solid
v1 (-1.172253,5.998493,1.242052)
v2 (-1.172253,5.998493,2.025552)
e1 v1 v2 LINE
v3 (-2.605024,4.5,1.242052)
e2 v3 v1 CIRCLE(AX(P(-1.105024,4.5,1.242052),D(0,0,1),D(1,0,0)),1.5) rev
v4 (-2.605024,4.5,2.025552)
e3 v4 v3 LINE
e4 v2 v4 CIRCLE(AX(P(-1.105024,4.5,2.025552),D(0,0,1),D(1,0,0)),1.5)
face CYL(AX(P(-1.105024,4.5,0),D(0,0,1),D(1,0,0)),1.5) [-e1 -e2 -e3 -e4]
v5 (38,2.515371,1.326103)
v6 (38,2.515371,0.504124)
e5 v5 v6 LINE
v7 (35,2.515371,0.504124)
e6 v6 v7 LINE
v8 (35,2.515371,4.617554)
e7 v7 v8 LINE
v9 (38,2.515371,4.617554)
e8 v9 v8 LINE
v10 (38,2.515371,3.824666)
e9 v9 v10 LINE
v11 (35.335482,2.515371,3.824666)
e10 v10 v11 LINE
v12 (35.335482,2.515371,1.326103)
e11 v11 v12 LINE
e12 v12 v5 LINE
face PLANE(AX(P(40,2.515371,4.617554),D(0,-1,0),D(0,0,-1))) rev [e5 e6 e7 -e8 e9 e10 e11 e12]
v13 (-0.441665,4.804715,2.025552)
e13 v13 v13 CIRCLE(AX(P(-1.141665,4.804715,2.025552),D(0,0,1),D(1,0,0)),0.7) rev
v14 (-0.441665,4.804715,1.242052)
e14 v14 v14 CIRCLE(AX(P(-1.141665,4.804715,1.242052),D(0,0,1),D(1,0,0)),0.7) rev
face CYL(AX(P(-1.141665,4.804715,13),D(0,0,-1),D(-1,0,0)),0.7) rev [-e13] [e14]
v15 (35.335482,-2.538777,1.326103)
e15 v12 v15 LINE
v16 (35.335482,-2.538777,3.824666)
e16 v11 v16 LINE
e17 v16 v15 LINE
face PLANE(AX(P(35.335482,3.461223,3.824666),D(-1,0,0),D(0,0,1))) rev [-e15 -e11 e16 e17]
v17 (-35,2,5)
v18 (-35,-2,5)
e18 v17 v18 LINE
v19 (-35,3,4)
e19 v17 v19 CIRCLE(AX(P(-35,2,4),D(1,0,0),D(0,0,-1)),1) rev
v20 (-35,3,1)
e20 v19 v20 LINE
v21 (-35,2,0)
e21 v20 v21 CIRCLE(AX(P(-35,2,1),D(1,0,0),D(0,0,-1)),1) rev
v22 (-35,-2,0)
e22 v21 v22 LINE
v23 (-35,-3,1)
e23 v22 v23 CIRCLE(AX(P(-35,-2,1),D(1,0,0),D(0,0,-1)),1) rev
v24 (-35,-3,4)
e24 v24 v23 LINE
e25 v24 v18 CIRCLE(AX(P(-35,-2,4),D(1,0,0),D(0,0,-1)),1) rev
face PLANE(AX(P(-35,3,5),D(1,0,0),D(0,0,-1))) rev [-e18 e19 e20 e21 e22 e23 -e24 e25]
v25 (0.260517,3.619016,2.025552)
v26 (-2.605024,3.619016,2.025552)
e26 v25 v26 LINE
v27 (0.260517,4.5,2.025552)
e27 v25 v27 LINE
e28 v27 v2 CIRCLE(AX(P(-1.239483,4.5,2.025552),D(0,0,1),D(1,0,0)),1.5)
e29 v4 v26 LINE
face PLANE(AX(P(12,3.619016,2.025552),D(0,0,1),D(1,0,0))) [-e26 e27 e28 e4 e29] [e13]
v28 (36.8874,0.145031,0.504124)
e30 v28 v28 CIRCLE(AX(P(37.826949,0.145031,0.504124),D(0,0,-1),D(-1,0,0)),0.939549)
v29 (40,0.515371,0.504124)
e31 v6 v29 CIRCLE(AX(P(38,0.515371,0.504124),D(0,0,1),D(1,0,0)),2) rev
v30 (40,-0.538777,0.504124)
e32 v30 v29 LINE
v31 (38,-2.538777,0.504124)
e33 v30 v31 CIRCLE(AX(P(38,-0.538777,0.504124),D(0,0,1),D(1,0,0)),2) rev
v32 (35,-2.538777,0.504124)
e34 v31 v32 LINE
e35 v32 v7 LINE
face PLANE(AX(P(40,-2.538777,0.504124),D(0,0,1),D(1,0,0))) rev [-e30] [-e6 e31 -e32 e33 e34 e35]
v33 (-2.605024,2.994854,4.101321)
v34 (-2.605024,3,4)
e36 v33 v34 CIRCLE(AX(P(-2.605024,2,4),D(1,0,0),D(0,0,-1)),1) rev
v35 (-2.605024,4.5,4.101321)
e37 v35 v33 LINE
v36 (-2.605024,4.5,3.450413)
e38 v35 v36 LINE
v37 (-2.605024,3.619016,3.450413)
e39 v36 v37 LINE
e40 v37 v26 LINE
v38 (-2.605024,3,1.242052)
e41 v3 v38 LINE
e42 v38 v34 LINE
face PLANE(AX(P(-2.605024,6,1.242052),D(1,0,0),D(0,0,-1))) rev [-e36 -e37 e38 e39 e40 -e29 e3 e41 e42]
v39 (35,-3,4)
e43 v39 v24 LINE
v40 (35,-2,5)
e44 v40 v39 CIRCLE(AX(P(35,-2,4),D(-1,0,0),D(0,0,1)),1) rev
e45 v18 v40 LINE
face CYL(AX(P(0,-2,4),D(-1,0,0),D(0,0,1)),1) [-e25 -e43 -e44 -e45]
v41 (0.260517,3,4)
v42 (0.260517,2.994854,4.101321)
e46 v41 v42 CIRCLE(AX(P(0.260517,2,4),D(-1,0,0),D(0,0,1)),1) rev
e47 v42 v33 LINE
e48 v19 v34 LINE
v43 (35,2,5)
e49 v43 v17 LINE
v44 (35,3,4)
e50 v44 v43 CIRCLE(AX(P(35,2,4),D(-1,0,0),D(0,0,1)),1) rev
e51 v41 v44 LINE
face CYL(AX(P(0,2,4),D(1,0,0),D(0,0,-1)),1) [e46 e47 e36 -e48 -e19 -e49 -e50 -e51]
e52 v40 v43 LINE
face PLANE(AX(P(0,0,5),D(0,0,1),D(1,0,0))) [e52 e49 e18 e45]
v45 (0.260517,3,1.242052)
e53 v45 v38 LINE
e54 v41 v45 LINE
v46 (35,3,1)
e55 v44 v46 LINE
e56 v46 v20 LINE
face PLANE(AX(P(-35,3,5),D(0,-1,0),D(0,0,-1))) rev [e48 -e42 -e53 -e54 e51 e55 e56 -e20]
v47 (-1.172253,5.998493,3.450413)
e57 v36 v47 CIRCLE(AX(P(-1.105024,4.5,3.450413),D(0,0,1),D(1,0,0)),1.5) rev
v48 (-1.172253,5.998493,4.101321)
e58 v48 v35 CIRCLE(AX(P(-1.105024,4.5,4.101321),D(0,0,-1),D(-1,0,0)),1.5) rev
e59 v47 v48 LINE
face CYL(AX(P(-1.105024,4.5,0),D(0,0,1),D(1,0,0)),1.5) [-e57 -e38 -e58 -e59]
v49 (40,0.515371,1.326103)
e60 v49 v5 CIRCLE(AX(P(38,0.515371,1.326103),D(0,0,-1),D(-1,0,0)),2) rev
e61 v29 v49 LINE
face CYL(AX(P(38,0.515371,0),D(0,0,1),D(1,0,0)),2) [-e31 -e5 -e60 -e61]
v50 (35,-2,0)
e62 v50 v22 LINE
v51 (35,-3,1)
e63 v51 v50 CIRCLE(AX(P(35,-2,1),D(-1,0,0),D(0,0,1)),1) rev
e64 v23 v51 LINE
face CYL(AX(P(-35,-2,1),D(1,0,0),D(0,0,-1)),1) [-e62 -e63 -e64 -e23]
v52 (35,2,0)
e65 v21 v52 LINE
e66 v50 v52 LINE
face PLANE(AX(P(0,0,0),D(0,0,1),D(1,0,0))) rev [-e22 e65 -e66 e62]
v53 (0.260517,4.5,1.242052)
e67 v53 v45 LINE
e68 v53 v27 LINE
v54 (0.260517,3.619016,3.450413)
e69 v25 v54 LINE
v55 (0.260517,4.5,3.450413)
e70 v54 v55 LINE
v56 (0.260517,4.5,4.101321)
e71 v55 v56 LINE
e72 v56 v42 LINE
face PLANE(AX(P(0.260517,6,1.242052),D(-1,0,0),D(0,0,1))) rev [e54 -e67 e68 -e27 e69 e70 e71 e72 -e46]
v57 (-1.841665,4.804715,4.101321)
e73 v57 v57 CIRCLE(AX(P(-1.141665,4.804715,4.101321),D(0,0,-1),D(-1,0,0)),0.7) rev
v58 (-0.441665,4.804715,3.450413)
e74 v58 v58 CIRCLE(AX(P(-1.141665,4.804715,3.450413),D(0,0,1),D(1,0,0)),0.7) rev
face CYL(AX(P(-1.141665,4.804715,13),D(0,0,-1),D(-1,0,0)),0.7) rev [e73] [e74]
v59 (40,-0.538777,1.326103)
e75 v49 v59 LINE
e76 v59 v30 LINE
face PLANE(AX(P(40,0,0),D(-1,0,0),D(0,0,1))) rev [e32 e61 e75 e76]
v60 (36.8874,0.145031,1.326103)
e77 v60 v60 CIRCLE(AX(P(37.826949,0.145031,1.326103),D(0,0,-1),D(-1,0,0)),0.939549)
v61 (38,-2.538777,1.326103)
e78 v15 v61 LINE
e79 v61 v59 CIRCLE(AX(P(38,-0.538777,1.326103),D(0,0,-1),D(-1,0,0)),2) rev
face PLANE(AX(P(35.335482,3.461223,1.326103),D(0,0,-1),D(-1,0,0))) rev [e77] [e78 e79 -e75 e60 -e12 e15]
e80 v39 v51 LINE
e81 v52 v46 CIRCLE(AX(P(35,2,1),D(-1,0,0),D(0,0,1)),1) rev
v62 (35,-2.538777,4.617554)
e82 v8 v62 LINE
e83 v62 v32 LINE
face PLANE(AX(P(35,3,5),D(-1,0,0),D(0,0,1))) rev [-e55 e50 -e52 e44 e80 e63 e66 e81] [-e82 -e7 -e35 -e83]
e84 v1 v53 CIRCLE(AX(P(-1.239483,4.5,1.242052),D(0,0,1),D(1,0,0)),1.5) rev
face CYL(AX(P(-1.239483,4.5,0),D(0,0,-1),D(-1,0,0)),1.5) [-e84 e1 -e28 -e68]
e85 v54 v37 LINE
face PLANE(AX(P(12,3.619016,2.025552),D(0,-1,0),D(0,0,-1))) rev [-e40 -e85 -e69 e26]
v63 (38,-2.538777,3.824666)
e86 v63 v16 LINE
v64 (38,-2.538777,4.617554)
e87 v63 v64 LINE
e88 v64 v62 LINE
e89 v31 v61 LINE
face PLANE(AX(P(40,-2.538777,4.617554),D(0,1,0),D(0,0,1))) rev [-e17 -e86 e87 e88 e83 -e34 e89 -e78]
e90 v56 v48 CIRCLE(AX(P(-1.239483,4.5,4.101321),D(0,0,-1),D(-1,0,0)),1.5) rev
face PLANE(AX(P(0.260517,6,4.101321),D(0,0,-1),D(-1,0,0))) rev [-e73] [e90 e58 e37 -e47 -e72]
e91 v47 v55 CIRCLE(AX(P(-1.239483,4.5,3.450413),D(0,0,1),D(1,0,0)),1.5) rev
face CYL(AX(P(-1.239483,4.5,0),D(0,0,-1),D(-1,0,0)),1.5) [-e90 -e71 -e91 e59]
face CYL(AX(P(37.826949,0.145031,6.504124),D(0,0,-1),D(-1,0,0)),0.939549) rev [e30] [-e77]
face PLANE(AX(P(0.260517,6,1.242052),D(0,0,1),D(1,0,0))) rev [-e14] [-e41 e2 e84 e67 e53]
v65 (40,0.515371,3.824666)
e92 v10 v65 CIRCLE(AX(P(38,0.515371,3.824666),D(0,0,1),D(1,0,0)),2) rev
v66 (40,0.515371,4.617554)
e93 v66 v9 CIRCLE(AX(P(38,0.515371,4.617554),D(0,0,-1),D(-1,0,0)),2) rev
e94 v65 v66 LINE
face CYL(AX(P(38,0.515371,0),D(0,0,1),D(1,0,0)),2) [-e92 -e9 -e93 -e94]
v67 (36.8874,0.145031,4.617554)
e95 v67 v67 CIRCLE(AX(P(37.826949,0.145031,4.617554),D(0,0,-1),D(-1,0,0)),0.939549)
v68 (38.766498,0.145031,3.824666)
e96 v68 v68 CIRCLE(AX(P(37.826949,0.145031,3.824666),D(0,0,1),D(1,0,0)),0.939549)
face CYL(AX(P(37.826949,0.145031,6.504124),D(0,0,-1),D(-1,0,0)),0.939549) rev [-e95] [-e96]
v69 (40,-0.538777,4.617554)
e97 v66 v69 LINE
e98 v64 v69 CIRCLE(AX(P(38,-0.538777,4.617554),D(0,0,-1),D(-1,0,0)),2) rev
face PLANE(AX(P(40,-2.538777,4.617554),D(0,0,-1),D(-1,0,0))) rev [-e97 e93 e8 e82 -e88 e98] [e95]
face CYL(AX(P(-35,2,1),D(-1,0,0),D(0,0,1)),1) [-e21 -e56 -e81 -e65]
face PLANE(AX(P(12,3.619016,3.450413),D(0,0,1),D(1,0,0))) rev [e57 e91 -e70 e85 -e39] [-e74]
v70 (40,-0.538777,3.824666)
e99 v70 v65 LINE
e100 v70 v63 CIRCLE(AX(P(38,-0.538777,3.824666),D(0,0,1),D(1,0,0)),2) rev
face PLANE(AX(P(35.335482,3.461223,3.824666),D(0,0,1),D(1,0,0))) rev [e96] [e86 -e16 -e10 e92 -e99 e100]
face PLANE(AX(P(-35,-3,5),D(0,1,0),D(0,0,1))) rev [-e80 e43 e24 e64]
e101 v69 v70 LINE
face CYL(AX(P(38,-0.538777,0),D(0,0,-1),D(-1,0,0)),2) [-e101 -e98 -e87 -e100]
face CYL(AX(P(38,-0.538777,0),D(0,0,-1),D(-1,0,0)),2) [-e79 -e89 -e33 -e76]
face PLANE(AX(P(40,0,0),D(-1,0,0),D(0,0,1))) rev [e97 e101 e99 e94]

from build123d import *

# Parameters (mm, degrees)
SKETCH1_W               = 70
SKETCH1_H               = 6
BOSS_EXTRUDE1_DEPTH     = 5
SKETCH5_W               = 4.113429611
SKETCH5_H               = 5.054148352
BOSS_EXTRUDE4_DEPTH     = 40
SKETCH9_W               = 5.188919622
SKETCH9_H               = 2.498562964
CUT_EXTRUDE6_DEPTH      = 6
FILLET14_R              = 1
FILLET15_R              = 1
SKETCH11_R              = 0.939549209
CUT_EXTRUDE8_DEPTH      = 6
FILLET19_R              = 2
SKETCH12_W              = 2.865541581
SKETCH12_H              = 2.859268941
BOSS_EXTRUDE5_DEPTH     = 6
CUT_EXTRUDE9_DEPTH      = 12
CUT_EXTRUDE9_DEPTH_BACK = 5
SKETCH13_W              = 1.424860979
SKETCH13_H              = 2.636738839
SKETCH14_R              = 0.7
CUT_EXTRUDE10_DEPTH     = 13
FILLET20_R              = 1.5


with BuildPart() as part:
    # Sketch1 → Boss-Extrude1 (new body)
    with BuildSketch(Plane.XY):
        Rectangle(SKETCH1_W, SKETCH1_H)
    extrude(amount=BOSS_EXTRUDE1_DEPTH)

    # Sketch5 → Boss-Extrude4 (add)
    with BuildSketch(Plane(origin=(0, 0, 0), x_dir=(0, 0, -1), z_dir=(1, 0, 0))):
        with Locations((-2.56083925, -0.011702819)):
            Rectangle(SKETCH5_W, SKETCH5_H)
    extrude(amount=BOSS_EXTRUDE4_DEPTH)

    # Sketch9 → Cut-Extrude6 (cut)
    with BuildSketch(Plane.XZ.offset(2.538776995)):
        with Locations((37.929941449, 2.575384926)):
            Rectangle(SKETCH9_W, SKETCH9_H)
    extrude(amount=-CUT_EXTRUDE6_DEPTH, mode=Mode.SUBTRACT)

    # Fillet14
    fillet14_edges = [part.edges().sort_by_distance(p)[0] for p in [
        (0, 3, 5),
    ]]
    fillet(fillet14_edges, radius=FILLET14_R)

    # Fillet15
    fillet15_edges = [part.edges().sort_by_distance(p)[0] for p in [
        (0, -3, 5),
        (0, -3, 0),
        (0, 3, 0),
    ]]
    fillet(fillet15_edges, radius=FILLET15_R)

    # Sketch11 → Cut-Extrude8 (cut)
    with BuildSketch(Plane(origin=(0, 0, 0.504124444), x_dir=(-1, 0, 0), z_dir=(0, 0, -1))):
        with Locations((-37.826949183, 0.145030674)):
            Circle(SKETCH11_R)
    extrude(amount=-CUT_EXTRUDE8_DEPTH, mode=Mode.SUBTRACT)

    # Fillet19
    fillet19_edges = [part.edges().sort_by_distance(p)[0] for p in [
        (40, 2.515371357, 0.915113944),
        (40, -2.538776995, 4.221110231),
        (40, 2.515371357, 4.221110231),
        (40, -2.538776995, 0.915113944),
    ]]
    fillet(fillet19_edges, radius=FILLET19_R)

    # Sketch12 → Boss-Extrude5 (add)
    with BuildSketch(Plane(origin=(0, 0, 0), x_dir=(1, 0, 0), z_dir=(0, 1, 0))):
        with Locations((-1.172253324, -2.671686226)):
            Rectangle(SKETCH12_W, SKETCH12_H)
    extrude(amount=BOSS_EXTRUDE5_DEPTH)

    # Sketch13 → Cut-Extrude9 (cut, two sides: drawn at the far end of the back side and taken through both)
    with BuildSketch(Plane(origin=(0, 0, 0), x_dir=(0, 0, -1), z_dir=(1, 0, 0)).offset(-CUT_EXTRUDE9_DEPTH_BACK)):
        with Locations((-2.737982633, 4.937385392)):
            Rectangle(SKETCH13_W, SKETCH13_H)
    extrude(amount=CUT_EXTRUDE9_DEPTH + CUT_EXTRUDE9_DEPTH_BACK, mode=Mode.SUBTRACT)

    # Sketch14 → Cut-Extrude10 (cut)
    with BuildSketch(Plane.XY):
        with Locations(Location((-1.141664566, 4.804714943, 0), (0, 0, 180))):
            Circle(SKETCH14_R)
    extrude(amount=CUT_EXTRUDE10_DEPTH, mode=Mode.SUBTRACT)

    # Fillet20
    # the kernel refuses this fillet: 1.5 mm, written as the material it takes off along each edge
    with BuildSketch(Plane(origin=(0.260517466, 6, 7.851320696), x_dir=(0, -1, 0), z_dir=(0, 0, -1)), Plane(origin=(-2.605024115, 6, -0.299586878), x_dir=(0, -1, 0), z_dir=(0, 0, 1))) as fillet20_piece_1:
        with BuildLine():
            CenterArc((FILLET20_R, FILLET20_R), FILLET20_R, 180, 90)
            Line((0, FILLET20_R), (0, 0))
            Line((0, 0), (FILLET20_R, 0))
        make_face()
    extrude(amount=8.150907574, mode=Mode.SUBTRACT)
    with BuildSketch(Plane(origin=(0.260517466, 6, 5.775552143), x_dir=(0, -1, 0), z_dir=(0, 0, -1)), Plane(origin=(-2.605024115, 6, -2.507948245), x_dir=(0, -1, 0), z_dir=(0, 0, 1))) as fillet20_piece_2:
        with BuildLine():
            CenterArc((FILLET20_R, FILLET20_R), FILLET20_R, 180, 90)
            Line((0, FILLET20_R), (0, 0))
            Line((0, 0), (FILLET20_R, 0))
        make_face()
    extrude(amount=8.283500388, mode=Mode.SUBTRACT)


solid = part.part
